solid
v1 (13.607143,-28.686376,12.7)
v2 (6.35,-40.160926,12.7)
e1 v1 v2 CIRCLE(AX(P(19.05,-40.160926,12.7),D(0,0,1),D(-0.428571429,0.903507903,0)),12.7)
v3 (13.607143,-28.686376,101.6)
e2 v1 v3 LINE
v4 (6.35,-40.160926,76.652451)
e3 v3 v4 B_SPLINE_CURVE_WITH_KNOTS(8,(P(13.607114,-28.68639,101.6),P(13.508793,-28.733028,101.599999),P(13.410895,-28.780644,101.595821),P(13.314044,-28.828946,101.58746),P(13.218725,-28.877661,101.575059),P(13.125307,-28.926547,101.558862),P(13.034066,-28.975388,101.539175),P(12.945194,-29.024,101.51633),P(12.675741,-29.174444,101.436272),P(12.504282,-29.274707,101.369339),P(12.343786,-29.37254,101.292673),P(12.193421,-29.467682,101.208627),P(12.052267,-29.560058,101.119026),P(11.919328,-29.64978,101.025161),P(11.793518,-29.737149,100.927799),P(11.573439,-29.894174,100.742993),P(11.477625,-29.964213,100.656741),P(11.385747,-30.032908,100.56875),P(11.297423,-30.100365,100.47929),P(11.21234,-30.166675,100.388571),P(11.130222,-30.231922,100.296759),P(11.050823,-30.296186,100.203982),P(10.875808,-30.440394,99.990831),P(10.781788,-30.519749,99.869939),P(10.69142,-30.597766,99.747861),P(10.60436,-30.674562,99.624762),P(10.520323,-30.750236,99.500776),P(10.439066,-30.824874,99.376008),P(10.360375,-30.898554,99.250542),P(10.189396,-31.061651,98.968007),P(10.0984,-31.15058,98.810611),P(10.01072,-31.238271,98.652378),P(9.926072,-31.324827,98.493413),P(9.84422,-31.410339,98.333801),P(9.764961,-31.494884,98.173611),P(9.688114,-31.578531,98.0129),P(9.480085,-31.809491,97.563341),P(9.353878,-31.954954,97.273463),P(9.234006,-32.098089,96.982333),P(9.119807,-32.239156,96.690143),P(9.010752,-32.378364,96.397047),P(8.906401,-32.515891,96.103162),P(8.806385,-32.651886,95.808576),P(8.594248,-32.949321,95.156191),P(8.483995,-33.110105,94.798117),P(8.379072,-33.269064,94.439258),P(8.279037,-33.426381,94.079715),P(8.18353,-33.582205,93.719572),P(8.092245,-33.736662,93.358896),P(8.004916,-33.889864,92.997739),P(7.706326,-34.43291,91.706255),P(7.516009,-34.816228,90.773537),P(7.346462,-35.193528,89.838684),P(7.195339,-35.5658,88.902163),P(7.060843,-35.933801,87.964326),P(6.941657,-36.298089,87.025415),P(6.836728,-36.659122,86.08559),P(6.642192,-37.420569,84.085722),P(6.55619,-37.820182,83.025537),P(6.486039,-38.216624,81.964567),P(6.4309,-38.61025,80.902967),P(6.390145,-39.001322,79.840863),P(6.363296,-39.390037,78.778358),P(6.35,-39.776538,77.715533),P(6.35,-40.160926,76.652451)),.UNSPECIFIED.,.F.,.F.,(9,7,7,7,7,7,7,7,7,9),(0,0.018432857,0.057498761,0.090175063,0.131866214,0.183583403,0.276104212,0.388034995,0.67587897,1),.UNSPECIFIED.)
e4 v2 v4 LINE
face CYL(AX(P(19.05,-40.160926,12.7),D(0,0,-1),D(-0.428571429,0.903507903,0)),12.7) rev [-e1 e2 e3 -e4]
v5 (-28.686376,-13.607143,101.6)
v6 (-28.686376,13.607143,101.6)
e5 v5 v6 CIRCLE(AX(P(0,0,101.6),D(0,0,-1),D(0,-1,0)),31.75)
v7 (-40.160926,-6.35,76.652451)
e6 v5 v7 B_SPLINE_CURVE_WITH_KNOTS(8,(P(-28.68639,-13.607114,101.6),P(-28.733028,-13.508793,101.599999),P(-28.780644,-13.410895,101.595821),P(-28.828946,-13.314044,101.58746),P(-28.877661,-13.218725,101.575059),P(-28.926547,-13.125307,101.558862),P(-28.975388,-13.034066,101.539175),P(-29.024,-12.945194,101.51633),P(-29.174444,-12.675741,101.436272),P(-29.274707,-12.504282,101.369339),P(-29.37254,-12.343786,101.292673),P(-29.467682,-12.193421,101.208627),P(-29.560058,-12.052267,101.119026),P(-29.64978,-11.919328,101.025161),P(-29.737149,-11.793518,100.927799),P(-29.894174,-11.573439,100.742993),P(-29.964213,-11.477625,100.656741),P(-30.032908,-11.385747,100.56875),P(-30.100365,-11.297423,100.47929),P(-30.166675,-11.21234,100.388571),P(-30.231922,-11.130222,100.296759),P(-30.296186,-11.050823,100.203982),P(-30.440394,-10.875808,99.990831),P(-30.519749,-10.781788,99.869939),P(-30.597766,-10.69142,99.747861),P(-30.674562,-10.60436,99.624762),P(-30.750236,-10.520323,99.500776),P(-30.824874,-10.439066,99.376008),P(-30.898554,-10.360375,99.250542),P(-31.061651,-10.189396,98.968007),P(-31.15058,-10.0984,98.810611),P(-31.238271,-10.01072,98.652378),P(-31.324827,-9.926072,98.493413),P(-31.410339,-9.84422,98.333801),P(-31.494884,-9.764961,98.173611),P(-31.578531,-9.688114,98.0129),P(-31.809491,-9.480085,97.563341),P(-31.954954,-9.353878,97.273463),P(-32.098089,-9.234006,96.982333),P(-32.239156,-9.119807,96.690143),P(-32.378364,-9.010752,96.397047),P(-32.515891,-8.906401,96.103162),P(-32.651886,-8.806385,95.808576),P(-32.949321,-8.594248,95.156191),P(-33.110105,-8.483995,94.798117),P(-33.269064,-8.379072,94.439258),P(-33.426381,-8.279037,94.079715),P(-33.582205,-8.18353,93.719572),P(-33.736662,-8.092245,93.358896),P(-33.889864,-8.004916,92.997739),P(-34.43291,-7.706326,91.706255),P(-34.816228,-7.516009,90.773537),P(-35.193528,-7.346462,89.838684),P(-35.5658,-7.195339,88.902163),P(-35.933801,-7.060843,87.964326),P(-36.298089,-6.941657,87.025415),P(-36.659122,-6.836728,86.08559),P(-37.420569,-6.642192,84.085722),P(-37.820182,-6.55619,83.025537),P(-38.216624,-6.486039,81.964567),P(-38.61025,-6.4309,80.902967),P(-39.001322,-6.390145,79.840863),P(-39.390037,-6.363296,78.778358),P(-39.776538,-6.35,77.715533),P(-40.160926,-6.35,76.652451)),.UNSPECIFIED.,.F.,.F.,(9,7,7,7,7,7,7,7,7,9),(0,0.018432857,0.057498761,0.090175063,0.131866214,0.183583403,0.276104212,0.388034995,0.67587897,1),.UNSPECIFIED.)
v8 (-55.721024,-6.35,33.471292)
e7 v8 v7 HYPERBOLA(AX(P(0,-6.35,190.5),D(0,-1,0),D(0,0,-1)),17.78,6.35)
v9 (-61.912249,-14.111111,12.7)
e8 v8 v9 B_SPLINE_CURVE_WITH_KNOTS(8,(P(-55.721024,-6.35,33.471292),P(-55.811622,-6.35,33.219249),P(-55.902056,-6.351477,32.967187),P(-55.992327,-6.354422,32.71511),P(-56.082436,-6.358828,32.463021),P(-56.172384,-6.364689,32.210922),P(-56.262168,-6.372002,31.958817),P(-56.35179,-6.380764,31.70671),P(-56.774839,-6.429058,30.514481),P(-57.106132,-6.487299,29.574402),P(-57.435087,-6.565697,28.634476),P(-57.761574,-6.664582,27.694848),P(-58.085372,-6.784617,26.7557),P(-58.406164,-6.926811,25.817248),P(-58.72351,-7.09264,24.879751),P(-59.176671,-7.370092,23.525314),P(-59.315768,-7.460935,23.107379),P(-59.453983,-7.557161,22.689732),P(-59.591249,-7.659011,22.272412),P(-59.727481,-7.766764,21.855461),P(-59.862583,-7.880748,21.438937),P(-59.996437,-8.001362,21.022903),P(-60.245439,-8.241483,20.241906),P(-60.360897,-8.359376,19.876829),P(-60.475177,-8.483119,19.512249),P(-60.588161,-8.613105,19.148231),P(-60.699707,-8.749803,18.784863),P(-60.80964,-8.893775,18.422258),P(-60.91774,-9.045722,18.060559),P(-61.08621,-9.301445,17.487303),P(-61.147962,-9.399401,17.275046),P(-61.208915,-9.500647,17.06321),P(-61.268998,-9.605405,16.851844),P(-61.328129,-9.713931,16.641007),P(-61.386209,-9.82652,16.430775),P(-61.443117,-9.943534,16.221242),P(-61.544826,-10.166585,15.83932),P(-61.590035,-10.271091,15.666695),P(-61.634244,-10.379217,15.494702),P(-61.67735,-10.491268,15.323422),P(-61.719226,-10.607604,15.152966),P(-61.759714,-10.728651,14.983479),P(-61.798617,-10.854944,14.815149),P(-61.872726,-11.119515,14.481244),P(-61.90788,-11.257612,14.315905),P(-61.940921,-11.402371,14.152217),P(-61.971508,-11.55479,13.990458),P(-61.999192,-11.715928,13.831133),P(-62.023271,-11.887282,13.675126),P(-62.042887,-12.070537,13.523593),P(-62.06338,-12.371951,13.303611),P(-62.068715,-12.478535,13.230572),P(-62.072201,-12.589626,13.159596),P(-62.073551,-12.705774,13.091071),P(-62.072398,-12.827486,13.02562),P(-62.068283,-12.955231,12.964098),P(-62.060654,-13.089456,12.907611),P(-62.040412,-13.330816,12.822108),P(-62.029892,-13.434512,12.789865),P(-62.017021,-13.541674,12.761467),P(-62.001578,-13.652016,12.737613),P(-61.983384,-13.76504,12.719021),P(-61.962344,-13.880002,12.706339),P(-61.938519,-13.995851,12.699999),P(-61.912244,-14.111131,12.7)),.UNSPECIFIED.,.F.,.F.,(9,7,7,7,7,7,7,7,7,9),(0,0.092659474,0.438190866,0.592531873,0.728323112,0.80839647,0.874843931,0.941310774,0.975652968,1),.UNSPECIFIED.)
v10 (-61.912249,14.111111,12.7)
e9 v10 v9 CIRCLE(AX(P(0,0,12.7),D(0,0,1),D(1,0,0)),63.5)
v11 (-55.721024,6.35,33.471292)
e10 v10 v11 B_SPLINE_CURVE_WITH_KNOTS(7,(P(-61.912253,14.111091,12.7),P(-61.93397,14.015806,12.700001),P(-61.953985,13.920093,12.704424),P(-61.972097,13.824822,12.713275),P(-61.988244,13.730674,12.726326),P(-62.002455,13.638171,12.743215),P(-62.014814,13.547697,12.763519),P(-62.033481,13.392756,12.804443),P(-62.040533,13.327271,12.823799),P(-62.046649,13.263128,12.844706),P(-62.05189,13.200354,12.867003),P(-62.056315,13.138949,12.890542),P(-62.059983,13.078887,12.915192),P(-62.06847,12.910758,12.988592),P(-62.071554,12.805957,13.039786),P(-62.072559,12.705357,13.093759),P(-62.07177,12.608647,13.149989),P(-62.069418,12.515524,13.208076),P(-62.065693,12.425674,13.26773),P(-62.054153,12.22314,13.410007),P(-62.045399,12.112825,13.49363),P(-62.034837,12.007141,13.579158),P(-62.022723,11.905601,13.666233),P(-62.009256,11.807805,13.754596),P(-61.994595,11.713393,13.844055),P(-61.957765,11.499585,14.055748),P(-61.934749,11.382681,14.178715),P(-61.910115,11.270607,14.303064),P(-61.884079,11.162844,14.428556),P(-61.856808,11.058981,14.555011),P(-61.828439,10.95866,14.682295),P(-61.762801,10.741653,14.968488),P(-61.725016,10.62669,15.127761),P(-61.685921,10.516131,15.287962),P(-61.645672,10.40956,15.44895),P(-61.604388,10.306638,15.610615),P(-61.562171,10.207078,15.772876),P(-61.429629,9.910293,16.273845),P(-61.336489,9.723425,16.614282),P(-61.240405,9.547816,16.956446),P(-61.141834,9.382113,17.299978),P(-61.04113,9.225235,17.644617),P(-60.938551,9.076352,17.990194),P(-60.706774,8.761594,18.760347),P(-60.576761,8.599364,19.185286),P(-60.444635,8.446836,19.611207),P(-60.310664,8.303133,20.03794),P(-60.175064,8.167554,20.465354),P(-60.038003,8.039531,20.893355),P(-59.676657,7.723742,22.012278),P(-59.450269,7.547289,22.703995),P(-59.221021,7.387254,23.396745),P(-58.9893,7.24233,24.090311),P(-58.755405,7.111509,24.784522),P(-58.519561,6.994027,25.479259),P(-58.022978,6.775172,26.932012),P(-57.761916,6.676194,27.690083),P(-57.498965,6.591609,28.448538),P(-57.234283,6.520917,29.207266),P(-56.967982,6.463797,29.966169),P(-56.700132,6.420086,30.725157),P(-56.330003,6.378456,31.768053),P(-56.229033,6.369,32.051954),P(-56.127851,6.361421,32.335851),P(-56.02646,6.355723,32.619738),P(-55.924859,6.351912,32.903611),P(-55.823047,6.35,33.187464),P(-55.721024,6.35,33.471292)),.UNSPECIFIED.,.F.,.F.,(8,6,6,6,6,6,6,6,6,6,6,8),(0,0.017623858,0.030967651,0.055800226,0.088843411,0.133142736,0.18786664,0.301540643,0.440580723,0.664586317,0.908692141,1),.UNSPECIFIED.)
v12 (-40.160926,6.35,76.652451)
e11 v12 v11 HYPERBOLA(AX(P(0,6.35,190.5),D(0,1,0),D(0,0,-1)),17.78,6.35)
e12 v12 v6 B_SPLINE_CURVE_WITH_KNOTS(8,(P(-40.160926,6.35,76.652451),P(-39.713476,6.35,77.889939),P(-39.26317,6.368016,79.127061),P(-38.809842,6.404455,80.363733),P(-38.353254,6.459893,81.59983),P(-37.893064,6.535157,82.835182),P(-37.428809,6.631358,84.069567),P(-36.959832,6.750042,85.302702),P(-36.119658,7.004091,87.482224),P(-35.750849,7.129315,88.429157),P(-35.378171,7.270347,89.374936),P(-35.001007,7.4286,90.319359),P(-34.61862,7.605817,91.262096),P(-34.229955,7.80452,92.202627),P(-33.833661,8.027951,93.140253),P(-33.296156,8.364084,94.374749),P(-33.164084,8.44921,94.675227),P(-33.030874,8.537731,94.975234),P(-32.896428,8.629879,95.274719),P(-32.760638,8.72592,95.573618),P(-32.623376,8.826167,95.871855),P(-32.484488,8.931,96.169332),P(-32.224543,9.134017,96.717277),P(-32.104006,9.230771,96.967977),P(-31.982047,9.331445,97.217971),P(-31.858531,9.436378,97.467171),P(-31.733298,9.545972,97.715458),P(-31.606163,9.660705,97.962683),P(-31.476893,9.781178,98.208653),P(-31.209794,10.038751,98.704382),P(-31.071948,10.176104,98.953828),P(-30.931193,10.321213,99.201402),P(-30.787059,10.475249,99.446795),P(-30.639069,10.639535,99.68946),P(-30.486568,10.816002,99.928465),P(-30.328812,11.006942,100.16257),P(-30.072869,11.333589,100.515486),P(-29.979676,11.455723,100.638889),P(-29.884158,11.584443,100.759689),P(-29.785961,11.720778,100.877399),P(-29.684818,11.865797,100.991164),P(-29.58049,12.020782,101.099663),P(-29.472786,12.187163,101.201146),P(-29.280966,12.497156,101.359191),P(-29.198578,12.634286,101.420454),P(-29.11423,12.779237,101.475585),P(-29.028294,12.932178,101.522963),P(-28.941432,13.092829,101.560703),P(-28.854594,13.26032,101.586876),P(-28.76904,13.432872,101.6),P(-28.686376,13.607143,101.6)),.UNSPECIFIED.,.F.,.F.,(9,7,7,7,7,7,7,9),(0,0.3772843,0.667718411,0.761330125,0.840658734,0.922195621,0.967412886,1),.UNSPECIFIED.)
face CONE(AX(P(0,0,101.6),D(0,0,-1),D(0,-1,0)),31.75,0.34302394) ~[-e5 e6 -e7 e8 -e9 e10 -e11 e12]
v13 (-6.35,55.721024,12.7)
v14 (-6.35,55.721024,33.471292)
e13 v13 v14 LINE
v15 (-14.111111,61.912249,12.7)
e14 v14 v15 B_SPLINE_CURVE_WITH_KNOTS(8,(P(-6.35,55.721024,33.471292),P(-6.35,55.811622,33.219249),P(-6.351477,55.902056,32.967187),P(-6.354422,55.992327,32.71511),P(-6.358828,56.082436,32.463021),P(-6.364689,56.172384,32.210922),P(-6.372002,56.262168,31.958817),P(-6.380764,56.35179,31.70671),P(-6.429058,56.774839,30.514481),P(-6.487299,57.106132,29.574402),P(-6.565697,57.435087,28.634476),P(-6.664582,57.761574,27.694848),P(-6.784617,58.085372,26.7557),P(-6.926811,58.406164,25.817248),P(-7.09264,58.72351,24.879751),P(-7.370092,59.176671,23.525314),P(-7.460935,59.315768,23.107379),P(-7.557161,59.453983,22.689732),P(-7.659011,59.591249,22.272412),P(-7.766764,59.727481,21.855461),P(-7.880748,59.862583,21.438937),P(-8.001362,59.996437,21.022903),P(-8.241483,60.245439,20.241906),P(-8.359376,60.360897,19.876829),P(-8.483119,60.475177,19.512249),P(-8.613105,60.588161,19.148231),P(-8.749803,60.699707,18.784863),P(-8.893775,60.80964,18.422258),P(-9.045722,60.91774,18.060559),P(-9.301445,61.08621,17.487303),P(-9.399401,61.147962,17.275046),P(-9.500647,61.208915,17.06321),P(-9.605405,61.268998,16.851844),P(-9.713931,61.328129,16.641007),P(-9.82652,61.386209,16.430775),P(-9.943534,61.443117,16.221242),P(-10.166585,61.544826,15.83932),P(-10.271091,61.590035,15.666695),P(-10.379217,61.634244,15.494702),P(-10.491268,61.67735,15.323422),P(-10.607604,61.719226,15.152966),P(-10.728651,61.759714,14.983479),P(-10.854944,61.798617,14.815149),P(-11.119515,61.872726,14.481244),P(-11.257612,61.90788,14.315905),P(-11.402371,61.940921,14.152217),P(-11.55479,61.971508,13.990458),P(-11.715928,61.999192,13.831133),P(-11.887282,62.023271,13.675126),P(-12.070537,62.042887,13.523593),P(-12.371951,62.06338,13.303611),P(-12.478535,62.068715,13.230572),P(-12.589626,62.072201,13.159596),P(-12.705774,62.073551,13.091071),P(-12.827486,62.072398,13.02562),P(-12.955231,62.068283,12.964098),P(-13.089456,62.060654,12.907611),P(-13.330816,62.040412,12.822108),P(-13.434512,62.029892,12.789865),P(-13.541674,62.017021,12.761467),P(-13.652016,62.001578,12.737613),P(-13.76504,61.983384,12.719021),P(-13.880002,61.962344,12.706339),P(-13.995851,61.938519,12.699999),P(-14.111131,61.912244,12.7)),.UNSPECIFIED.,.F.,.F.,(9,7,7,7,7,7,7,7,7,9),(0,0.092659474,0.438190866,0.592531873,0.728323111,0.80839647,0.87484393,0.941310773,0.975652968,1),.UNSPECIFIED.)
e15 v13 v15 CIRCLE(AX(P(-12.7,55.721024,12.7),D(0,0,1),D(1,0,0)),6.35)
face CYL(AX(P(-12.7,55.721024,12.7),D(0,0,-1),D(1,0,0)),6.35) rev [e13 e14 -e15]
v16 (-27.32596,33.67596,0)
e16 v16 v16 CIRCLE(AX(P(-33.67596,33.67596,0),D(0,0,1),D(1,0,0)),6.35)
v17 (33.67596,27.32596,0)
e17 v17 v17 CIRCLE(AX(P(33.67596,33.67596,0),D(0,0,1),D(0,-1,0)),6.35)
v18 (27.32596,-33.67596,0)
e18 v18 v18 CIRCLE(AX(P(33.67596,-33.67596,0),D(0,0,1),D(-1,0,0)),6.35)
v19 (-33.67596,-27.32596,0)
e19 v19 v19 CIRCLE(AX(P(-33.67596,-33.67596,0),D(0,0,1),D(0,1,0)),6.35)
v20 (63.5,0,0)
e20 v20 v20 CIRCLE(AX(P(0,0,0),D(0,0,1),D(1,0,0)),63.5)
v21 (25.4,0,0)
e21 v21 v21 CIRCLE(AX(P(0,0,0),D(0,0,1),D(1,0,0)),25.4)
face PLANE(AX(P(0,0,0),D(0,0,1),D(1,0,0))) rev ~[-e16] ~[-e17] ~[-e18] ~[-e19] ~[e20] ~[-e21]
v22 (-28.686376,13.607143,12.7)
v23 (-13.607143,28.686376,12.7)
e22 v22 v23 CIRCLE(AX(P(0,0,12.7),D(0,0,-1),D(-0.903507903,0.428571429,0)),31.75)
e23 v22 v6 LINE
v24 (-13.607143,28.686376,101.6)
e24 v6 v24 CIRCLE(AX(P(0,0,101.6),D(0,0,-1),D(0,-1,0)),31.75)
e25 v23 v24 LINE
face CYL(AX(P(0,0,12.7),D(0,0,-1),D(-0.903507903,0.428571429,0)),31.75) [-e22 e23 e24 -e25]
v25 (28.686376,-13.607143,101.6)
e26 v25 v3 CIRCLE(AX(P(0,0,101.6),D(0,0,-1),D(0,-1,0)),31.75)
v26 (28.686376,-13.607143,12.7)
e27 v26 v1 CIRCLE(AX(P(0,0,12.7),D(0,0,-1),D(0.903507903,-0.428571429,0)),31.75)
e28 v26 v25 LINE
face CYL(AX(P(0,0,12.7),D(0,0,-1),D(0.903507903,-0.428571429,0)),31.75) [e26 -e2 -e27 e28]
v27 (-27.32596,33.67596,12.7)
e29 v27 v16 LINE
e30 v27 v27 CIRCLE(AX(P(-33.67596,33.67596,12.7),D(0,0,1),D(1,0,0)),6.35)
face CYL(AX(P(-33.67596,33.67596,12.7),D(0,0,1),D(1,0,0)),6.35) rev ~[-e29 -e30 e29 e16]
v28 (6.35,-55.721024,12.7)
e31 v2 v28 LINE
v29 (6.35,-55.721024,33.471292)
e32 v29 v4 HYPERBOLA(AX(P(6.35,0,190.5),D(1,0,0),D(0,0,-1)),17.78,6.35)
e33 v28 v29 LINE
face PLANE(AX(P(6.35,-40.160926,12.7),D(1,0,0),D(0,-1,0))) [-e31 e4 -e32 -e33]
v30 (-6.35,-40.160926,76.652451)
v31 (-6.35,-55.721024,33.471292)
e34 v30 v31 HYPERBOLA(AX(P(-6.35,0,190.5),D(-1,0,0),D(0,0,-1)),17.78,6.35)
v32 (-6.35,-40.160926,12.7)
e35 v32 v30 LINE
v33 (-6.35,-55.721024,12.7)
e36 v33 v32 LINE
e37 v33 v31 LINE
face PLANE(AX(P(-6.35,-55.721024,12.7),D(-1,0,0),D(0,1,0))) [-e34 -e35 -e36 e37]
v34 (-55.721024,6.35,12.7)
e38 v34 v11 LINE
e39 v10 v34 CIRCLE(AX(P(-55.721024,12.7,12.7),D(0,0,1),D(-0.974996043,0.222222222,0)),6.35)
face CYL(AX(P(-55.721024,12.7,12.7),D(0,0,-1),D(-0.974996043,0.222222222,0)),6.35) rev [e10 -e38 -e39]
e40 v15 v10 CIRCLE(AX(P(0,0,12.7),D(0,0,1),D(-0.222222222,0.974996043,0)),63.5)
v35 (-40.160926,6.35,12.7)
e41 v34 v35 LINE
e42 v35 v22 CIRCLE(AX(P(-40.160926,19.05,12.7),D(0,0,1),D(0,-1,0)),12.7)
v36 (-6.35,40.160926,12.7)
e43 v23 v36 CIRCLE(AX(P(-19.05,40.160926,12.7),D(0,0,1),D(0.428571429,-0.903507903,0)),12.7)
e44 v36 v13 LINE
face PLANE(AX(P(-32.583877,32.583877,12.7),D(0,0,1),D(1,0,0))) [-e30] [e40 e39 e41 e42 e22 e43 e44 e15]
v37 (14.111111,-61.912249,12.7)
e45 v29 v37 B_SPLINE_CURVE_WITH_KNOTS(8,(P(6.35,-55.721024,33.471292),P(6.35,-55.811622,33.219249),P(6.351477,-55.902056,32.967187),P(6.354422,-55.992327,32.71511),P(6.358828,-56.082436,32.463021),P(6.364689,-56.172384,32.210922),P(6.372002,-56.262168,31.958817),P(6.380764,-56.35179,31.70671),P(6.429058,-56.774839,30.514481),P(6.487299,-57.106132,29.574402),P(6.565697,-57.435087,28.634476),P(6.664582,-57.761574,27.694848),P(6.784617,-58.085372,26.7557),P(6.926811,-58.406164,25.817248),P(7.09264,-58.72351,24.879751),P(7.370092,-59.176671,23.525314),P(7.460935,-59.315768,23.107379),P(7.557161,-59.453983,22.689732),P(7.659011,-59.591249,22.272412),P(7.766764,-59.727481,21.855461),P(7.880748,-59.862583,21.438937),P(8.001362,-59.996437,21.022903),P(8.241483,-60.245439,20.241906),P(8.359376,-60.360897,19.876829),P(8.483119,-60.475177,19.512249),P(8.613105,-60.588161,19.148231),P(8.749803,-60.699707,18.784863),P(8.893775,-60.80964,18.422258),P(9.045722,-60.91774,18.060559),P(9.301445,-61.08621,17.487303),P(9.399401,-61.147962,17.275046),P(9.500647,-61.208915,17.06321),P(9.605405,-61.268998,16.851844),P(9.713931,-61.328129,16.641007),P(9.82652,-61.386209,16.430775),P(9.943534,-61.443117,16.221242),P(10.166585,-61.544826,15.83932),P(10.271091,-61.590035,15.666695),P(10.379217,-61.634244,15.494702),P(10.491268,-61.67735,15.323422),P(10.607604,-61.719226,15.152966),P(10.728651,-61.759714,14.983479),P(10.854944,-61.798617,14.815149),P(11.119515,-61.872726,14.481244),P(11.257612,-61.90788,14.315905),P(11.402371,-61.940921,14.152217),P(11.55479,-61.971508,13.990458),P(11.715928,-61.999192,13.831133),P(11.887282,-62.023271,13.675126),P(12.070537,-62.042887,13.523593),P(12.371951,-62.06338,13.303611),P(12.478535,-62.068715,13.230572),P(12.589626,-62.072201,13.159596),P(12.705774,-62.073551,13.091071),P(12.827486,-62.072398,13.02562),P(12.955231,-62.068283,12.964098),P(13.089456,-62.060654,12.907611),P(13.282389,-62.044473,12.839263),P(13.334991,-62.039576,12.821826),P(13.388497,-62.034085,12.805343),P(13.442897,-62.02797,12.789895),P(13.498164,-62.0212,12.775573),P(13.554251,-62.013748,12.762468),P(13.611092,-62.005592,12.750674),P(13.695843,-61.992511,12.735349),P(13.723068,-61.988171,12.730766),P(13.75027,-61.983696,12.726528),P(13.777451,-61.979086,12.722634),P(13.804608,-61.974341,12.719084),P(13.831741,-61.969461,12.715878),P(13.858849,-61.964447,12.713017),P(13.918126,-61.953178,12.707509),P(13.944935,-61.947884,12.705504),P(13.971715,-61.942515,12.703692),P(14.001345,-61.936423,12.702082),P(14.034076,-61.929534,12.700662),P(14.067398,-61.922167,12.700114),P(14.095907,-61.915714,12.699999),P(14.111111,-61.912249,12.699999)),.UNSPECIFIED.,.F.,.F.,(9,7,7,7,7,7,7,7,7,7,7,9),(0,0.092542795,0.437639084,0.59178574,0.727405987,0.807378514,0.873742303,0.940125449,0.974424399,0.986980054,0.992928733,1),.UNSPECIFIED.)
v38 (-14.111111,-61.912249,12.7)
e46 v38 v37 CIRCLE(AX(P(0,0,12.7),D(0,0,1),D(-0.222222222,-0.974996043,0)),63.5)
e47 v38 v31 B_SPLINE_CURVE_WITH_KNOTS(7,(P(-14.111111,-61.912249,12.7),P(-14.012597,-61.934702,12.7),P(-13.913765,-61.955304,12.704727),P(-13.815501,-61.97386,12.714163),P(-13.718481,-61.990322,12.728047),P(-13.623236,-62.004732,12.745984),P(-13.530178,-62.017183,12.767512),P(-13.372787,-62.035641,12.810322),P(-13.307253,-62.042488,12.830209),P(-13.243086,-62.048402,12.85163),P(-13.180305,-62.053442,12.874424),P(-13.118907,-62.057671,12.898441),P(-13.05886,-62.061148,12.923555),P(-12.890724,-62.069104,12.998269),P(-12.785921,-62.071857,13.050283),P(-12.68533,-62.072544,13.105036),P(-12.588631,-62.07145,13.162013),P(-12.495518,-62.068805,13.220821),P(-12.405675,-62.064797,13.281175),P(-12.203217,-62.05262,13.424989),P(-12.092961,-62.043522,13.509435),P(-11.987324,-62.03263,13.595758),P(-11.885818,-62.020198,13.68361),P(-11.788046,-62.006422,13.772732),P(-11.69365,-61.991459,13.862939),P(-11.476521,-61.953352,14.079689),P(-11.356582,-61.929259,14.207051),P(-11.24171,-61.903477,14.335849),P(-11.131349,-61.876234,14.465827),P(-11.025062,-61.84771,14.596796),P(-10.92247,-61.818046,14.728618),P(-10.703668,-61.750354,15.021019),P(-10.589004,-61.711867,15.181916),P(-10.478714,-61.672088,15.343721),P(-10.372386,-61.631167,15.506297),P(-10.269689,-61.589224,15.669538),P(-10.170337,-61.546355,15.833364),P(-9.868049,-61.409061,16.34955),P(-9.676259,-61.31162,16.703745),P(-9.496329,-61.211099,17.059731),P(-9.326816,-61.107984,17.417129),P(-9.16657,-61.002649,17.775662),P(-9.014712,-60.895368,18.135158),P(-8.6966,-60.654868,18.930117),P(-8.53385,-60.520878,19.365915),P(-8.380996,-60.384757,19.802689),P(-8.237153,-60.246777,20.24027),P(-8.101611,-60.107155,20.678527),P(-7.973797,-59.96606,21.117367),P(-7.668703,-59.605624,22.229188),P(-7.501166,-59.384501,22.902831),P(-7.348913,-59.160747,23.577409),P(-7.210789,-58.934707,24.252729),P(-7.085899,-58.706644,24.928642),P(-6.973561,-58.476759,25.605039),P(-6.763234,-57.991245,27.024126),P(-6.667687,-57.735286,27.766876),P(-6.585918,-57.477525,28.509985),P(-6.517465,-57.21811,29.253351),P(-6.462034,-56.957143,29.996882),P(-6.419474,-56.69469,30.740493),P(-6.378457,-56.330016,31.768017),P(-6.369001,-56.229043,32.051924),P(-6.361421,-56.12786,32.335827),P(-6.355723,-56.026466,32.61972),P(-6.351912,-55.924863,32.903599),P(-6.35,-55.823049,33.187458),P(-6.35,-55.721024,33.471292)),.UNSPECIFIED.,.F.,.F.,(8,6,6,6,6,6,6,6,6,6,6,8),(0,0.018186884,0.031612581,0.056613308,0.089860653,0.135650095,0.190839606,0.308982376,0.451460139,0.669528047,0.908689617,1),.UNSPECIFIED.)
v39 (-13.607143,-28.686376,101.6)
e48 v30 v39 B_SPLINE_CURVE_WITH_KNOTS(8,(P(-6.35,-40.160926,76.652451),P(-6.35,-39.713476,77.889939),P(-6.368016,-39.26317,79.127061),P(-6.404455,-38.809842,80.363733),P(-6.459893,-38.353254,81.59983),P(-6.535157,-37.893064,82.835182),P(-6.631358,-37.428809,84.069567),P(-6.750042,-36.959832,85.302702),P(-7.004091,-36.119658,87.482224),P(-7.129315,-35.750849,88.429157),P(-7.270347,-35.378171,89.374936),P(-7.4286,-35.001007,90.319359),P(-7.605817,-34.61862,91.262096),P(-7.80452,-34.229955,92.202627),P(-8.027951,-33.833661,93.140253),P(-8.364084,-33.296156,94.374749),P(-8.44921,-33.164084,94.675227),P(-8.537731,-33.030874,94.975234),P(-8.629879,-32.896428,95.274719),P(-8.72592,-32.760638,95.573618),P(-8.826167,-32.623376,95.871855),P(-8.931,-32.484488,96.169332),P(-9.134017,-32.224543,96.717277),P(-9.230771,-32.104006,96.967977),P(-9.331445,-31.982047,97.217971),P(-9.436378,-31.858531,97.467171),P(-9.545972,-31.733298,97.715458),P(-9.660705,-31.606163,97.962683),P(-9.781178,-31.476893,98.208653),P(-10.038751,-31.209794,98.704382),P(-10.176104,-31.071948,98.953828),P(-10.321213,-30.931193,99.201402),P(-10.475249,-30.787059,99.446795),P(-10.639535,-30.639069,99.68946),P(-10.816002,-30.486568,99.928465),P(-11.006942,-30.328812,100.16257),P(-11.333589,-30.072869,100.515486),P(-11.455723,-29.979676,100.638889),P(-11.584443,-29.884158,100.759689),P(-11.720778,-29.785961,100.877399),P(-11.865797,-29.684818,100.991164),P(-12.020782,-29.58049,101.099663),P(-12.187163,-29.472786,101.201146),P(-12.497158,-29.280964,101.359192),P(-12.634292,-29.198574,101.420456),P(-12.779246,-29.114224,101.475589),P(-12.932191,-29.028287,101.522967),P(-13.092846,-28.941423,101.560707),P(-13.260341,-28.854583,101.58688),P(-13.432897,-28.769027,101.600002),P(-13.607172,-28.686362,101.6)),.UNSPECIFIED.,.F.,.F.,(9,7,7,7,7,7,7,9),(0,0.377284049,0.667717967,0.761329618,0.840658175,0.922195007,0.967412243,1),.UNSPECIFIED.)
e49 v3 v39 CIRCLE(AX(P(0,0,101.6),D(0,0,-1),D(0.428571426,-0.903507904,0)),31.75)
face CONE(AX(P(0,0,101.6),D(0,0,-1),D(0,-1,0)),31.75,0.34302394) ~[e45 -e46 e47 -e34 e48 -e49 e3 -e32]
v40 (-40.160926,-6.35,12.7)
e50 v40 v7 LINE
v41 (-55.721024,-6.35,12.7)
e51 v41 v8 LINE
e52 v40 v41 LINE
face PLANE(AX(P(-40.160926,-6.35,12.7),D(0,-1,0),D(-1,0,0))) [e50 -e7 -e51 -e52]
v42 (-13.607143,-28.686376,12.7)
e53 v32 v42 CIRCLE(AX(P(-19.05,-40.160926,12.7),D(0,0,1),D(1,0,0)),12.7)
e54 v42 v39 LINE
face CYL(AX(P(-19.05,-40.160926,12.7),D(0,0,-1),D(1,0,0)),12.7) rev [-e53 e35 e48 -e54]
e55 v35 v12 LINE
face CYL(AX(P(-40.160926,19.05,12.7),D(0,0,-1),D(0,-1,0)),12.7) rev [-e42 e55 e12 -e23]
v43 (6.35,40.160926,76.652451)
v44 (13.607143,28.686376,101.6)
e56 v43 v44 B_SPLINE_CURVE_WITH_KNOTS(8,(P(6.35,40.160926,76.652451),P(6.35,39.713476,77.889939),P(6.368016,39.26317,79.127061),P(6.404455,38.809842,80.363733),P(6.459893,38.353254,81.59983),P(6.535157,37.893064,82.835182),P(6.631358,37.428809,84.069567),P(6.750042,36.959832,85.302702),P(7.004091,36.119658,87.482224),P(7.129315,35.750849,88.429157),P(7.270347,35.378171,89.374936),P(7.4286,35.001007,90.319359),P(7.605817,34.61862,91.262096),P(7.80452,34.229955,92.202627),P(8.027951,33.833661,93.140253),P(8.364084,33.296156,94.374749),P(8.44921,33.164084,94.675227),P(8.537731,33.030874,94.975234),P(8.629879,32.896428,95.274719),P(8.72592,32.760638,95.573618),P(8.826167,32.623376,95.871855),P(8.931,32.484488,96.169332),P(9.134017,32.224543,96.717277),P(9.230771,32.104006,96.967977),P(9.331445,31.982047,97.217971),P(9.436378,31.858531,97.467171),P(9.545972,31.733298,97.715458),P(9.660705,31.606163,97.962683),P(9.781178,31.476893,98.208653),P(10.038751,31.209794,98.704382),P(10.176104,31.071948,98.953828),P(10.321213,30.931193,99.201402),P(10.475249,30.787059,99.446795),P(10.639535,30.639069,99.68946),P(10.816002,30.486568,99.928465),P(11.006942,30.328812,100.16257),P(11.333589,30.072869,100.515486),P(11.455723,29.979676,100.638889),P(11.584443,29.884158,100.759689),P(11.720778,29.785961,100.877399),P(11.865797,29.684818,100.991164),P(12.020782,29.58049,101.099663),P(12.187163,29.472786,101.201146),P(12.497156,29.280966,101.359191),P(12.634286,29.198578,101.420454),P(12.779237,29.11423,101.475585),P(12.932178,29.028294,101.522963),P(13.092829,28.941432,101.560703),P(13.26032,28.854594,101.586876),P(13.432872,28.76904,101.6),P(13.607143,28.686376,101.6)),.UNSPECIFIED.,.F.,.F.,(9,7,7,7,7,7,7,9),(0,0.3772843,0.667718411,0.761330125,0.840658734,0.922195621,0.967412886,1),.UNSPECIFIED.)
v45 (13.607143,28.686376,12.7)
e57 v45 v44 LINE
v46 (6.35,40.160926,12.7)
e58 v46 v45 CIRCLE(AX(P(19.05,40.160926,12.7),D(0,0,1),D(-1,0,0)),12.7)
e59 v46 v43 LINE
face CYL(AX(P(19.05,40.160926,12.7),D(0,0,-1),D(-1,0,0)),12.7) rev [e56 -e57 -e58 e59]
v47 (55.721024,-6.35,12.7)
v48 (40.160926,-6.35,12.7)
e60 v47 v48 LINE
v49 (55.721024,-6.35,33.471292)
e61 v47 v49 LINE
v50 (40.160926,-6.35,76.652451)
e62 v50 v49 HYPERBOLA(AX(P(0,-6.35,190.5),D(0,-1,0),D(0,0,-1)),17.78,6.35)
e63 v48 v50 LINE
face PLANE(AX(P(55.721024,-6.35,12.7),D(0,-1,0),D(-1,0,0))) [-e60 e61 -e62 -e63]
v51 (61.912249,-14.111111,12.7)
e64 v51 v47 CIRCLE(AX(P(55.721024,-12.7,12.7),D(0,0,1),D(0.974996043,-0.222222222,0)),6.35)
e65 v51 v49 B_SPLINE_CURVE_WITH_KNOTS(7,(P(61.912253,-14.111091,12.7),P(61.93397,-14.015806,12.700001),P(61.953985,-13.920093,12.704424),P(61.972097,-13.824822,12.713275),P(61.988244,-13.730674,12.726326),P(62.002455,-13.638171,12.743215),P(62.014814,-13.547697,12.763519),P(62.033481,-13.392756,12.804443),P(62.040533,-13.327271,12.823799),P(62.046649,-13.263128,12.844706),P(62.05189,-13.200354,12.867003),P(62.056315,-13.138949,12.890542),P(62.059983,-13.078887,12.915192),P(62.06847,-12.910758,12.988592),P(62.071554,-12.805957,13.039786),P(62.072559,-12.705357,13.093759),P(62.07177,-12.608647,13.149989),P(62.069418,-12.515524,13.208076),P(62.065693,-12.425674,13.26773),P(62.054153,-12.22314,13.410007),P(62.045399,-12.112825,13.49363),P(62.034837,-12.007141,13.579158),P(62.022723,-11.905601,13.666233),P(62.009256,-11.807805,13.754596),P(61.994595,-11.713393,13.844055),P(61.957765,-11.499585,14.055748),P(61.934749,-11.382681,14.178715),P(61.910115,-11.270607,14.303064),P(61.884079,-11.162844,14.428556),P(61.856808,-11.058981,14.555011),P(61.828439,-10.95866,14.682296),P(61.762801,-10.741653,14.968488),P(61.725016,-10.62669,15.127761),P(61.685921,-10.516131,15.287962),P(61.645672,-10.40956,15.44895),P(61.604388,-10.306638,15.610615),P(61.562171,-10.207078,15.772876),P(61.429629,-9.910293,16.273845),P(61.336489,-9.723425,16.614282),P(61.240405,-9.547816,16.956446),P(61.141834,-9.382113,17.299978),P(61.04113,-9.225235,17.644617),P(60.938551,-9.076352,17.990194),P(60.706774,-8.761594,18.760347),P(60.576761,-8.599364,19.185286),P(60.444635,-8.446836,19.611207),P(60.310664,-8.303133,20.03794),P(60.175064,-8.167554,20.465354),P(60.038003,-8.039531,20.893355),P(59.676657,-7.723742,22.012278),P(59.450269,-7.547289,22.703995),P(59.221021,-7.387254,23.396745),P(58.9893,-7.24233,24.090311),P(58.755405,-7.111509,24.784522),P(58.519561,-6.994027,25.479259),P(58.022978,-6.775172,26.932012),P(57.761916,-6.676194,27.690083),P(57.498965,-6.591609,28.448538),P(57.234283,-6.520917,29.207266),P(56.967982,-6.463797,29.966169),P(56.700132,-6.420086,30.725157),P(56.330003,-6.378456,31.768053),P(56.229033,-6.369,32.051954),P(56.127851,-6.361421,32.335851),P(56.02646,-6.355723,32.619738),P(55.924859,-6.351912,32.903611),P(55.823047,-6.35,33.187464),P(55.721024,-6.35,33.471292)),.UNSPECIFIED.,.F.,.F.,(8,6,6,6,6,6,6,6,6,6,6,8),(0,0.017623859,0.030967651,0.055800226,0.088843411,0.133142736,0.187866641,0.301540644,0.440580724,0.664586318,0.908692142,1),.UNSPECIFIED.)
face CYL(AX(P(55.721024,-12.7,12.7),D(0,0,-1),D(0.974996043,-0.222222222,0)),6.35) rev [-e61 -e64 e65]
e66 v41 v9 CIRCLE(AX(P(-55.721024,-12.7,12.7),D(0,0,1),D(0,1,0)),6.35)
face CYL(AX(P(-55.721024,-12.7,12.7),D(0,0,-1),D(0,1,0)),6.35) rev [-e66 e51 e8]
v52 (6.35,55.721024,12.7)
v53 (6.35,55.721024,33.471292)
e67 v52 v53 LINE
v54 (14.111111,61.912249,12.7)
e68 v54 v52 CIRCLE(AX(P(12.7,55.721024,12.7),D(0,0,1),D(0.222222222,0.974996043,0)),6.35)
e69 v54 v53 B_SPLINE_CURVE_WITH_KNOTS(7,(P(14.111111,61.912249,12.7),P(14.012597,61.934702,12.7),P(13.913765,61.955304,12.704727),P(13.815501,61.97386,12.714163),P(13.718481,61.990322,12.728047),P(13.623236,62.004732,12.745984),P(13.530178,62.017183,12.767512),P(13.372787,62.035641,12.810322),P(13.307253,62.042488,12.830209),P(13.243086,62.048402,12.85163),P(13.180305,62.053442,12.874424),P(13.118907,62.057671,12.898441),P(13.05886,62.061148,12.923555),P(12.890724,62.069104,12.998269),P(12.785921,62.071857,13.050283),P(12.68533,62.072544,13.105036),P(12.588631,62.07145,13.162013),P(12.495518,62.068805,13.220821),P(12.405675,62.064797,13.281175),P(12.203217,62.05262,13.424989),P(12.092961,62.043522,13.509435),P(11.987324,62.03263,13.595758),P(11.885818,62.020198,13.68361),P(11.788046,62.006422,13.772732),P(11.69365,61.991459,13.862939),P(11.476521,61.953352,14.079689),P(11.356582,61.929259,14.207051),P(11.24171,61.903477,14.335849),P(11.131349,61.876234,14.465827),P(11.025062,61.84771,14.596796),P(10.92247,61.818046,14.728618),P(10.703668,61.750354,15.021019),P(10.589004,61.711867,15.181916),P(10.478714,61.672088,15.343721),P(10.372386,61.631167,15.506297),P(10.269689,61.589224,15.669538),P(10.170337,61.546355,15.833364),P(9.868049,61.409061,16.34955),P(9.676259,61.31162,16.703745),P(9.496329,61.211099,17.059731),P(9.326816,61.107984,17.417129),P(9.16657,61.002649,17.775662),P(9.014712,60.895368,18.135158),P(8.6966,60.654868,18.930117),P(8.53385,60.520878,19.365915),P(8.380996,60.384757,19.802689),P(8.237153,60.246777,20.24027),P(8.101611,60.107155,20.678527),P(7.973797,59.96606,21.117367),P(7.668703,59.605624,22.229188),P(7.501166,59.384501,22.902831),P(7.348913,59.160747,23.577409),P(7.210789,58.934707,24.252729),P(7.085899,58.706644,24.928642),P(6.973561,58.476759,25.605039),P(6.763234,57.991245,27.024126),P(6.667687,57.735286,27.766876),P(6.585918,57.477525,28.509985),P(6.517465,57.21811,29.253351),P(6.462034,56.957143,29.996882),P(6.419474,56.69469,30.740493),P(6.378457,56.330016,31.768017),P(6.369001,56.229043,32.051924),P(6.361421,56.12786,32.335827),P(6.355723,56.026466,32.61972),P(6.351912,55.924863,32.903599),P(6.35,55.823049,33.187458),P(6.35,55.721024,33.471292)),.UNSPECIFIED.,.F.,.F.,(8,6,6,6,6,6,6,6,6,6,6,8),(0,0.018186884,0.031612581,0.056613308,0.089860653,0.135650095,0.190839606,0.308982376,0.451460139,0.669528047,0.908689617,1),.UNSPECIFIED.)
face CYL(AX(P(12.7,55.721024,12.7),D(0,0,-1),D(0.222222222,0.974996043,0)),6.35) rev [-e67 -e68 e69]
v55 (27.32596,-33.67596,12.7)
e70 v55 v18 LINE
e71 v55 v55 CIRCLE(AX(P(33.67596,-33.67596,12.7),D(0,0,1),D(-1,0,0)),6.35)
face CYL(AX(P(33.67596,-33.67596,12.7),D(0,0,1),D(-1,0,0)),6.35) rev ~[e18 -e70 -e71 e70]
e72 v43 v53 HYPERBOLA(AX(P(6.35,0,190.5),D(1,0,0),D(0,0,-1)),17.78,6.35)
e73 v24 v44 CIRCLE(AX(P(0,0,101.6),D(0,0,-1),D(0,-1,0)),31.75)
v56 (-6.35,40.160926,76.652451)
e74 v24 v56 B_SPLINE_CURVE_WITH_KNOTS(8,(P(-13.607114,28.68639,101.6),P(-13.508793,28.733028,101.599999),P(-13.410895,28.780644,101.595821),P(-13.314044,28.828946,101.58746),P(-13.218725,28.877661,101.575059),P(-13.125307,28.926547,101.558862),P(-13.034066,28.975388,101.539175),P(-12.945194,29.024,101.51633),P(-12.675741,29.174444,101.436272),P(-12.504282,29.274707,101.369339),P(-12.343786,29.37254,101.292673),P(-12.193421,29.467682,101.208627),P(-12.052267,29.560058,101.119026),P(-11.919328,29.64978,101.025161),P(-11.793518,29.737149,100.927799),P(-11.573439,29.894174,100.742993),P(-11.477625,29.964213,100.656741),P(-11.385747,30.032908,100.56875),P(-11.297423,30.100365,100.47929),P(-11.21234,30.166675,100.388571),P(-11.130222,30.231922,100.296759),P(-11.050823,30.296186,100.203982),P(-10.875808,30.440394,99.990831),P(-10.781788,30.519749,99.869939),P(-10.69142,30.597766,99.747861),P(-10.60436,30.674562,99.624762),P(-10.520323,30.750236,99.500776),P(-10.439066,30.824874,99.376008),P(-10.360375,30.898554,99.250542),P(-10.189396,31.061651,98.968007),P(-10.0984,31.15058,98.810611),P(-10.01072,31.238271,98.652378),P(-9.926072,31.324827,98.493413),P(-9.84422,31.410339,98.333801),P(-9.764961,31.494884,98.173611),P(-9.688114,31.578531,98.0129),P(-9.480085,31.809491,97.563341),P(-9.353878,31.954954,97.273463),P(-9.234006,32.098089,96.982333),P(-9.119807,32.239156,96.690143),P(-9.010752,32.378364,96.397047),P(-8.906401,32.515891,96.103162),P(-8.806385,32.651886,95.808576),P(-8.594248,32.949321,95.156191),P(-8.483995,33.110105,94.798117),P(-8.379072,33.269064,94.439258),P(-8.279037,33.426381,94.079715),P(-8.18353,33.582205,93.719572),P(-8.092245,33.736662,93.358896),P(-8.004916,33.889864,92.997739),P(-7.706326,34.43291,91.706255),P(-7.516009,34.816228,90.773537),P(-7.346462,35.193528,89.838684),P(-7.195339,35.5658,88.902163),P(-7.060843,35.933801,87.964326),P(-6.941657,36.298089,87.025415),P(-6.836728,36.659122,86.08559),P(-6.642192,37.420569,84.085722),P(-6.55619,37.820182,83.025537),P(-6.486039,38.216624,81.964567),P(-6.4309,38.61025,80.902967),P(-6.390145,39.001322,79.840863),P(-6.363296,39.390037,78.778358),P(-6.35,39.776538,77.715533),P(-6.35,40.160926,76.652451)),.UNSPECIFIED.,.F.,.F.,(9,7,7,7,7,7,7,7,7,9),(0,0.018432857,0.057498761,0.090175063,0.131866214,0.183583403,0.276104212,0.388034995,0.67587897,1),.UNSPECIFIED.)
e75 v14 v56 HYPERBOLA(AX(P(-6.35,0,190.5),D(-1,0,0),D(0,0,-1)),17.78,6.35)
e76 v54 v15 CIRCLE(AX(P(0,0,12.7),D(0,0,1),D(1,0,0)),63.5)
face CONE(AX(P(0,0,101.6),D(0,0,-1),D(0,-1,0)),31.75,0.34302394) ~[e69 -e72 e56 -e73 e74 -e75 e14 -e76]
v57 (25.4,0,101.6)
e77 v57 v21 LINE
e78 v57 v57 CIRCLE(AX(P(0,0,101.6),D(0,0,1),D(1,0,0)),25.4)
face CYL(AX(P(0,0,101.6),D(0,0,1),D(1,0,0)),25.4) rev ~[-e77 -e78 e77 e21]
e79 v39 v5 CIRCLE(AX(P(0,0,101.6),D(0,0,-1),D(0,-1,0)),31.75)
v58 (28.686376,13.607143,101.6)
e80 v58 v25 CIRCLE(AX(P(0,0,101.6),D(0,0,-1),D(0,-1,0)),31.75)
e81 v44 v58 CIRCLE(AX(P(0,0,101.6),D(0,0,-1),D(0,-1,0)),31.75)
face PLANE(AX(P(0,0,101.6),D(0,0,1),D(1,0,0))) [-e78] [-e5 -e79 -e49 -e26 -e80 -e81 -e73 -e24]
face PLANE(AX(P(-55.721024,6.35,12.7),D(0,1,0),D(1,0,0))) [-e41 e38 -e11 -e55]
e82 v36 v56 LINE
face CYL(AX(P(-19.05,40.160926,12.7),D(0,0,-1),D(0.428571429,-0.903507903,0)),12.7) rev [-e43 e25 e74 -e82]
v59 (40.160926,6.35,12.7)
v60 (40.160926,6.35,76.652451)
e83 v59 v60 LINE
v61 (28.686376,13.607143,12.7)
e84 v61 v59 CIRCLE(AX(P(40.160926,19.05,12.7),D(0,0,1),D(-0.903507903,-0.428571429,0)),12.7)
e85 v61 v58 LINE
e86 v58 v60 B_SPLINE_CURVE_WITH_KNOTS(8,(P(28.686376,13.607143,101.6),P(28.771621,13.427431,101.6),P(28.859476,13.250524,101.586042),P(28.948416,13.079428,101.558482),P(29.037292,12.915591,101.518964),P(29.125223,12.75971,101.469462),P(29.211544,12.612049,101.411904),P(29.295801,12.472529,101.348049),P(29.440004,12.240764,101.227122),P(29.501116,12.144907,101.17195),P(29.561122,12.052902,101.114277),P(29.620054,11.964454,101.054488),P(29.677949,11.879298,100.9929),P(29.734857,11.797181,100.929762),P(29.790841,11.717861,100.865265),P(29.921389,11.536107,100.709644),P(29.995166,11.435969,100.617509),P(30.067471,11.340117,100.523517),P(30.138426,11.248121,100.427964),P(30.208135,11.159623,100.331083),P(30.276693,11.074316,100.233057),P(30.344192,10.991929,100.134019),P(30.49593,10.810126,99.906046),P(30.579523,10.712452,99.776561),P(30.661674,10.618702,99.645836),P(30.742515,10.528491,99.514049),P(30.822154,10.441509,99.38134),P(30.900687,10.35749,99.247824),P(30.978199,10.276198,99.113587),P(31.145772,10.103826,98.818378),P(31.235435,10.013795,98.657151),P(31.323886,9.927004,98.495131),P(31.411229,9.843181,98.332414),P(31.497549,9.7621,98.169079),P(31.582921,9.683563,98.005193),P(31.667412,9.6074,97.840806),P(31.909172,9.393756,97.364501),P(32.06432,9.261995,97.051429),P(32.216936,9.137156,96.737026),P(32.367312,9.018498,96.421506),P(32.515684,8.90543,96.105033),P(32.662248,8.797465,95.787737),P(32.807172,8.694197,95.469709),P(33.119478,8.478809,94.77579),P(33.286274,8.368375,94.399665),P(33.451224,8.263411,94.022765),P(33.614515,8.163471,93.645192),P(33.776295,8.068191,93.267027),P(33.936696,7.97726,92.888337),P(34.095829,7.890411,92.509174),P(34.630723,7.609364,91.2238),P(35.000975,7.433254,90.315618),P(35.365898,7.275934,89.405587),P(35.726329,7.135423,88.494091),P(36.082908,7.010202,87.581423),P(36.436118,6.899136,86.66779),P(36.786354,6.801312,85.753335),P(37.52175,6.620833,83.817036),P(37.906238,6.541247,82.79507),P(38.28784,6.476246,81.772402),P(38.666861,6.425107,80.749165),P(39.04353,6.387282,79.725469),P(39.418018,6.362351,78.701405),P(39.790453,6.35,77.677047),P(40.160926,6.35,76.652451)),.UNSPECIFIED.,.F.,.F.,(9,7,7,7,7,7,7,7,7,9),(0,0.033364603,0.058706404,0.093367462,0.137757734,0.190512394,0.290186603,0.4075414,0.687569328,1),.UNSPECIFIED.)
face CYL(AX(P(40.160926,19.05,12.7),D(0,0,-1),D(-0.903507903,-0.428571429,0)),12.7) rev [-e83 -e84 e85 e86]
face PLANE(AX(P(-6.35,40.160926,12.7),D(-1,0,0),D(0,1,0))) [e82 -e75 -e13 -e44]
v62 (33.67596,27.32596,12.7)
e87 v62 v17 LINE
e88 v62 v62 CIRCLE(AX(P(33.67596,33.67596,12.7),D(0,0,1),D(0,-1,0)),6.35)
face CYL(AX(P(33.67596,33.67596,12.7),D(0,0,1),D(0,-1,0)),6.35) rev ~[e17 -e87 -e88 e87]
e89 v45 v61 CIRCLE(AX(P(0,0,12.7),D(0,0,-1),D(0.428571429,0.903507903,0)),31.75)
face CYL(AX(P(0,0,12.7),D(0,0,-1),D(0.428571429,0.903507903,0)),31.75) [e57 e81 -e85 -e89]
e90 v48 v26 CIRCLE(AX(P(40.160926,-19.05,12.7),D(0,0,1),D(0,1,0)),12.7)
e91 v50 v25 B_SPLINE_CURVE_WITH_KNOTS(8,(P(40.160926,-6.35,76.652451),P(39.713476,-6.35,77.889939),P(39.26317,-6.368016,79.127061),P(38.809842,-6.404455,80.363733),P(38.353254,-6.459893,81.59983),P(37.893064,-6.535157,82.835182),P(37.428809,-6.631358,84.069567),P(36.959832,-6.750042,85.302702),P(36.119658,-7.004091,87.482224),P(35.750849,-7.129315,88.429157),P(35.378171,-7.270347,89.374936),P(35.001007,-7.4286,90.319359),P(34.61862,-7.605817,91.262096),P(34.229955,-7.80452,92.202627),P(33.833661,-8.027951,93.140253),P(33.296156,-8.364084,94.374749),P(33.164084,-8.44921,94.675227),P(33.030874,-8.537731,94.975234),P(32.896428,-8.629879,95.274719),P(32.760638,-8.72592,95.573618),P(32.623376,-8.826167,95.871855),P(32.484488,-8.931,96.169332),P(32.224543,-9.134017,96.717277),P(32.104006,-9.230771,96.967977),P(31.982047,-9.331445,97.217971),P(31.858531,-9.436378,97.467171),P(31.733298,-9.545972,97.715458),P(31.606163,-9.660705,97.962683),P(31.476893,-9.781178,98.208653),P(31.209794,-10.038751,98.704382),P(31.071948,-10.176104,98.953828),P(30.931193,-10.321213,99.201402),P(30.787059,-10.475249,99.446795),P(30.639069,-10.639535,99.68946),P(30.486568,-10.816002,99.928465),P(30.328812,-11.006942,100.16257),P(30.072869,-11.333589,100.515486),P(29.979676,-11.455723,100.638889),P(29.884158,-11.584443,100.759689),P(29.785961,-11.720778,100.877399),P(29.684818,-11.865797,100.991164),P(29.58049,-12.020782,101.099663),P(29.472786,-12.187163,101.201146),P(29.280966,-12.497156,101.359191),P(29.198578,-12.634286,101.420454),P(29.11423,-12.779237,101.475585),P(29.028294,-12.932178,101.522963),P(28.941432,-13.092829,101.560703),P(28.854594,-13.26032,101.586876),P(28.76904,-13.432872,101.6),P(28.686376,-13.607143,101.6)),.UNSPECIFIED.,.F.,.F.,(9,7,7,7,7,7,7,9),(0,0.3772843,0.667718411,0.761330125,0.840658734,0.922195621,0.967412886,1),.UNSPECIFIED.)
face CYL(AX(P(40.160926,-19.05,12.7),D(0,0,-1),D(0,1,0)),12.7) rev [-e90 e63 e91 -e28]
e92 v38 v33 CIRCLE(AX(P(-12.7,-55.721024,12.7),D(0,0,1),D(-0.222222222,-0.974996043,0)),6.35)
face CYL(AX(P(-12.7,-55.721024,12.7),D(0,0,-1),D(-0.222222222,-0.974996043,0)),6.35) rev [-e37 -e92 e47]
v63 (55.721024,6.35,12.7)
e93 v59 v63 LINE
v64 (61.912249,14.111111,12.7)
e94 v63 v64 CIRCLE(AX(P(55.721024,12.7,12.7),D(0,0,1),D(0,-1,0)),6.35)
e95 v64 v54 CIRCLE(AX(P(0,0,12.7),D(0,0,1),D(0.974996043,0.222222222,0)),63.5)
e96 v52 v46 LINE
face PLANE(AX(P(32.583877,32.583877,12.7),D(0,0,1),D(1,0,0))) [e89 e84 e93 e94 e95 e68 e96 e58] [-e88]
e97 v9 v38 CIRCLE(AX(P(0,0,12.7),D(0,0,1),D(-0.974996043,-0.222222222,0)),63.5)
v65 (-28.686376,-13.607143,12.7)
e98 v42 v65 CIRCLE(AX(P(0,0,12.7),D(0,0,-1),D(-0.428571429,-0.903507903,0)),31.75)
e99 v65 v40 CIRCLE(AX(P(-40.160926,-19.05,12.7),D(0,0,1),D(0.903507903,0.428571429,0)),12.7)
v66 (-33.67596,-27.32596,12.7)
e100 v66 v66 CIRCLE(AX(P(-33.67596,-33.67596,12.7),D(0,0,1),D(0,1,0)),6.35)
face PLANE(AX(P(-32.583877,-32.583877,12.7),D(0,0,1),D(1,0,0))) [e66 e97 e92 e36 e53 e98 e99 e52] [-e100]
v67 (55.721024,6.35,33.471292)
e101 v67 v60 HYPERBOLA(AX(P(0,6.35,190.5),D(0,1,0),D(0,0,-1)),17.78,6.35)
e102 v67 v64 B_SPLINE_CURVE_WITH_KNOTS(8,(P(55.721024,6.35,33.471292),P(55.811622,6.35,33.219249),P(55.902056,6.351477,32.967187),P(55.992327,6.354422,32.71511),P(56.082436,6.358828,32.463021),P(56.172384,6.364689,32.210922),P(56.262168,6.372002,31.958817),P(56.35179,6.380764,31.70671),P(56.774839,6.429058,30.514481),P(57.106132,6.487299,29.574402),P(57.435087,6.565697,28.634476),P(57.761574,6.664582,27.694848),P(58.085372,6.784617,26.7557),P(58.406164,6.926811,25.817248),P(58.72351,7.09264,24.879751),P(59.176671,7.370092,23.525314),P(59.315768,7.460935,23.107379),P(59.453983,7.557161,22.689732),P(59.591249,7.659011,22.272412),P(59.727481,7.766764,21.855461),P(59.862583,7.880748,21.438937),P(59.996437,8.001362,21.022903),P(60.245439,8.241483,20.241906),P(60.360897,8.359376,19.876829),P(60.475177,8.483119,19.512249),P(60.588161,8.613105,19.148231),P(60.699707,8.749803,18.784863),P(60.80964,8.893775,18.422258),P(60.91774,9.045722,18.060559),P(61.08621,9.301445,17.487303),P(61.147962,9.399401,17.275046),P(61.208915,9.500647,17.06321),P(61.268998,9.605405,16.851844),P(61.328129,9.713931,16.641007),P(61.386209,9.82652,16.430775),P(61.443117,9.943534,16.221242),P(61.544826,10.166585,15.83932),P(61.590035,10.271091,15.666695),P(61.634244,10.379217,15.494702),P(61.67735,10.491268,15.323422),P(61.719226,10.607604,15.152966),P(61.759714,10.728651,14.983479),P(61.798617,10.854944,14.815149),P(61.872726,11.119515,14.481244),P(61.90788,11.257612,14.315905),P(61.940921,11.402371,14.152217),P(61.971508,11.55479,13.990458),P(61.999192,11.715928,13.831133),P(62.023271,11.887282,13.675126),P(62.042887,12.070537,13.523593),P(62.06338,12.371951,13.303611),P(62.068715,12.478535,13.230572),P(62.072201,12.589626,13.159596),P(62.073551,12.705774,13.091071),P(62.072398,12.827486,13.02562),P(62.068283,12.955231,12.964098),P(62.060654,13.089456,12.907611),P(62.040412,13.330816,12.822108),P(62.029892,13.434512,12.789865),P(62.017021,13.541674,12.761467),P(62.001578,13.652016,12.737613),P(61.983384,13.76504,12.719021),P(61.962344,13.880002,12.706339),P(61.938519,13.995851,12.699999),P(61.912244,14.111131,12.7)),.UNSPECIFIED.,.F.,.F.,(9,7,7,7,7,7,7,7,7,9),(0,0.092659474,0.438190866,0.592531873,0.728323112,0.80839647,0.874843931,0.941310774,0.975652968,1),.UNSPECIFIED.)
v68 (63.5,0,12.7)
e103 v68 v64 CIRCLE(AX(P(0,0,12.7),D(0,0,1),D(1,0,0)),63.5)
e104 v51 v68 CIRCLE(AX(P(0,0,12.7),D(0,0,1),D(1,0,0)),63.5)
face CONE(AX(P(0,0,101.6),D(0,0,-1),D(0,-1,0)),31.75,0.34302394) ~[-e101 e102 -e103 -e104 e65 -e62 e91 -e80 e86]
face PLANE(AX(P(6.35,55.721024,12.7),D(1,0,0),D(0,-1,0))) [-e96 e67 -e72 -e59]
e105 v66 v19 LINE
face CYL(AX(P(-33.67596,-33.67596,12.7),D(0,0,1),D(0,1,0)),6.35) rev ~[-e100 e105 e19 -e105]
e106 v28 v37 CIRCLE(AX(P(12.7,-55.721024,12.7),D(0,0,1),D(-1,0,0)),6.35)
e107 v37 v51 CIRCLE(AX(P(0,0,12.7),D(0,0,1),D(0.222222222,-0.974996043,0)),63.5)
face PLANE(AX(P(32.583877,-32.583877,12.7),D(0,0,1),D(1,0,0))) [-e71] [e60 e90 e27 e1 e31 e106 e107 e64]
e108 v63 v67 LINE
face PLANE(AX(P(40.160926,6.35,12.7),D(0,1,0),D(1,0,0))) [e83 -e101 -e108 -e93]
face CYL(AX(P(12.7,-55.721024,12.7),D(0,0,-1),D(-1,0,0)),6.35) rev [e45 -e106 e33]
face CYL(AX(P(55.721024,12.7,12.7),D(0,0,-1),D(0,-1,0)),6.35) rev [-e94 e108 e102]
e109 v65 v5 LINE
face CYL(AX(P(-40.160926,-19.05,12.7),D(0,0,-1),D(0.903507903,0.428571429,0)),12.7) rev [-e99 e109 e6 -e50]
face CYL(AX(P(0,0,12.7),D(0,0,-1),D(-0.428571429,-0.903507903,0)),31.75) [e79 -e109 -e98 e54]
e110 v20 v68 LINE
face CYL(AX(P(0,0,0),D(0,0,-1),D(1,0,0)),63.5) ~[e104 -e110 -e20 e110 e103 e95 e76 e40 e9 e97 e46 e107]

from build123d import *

# Parameters (mm, degrees)
F0_R            = 63.5
F1_DEPTH        = 12.7
F2_R            = 31.75
F3_DEPTH        = 88.9
F7_DEPTH        = 88.9010001
F8_R            = 6.35
F9_DEPTH        = 12.701
F9_COPIES_COUNT = 4
F10_R           = 25.4
F11_DEPTH       = 101.601


# Not quite as in the source:
# - a pattern or mirror of a feature is missing from the dataset's text; its kind, count and spacing are read off the source's solid


with BuildPart() as f1:
    # F0 (on Top) → F1 (new body)
    with BuildSketch(Plane.XY):
        Circle(F0_R)
    extrude(amount=F1_DEPTH)

    # F2 (on face) → F3 (join)
    with BuildSketch(Plane.XY.offset(12.7)):
        Circle(F2_R)
    extrude(amount=F3_DEPTH)

    # F4 (on Right) → F5 (revolve)
    with BuildSketch(Plane.YZ):
        Polygon((-31.75, 12.7), (-31.75, 101.6), (-63.5, 12.7), align=None)
    revolve(axis=Axis((0, 0, 73.5445022583), (0, 0, 1)))

    # F6 (on face) → F7 (cut, through all)
    with BuildSketch(Plane.XY.offset(12.7)):
        with BuildLine():
            ThreePointArc((-14.1111111111, 61.9122487333), (-44.9012806053, 44.9012806053), (-61.9122487333, 14.1111111111))
            ThreePointArc((-61.9122487333, 14.1111111111), (-60.6850472058, 8.7400792657), (-55.7210238599, 6.35))
            Line((-55.7210238599, 6.35), (-40.1609262841, 6.35))
            ThreePointArc((-40.1609262841, 6.35), (-33.3724907396, 8.3165409649), (-28.6863759172, 13.6071428571))
            ThreePointArc((-28.6863759172, 13.6071428571), (-22.4506403027, 22.4506403027), (-13.6071428571, 28.6863759172))
            ThreePointArc((-13.6071428571, 28.6863759172), (-8.3165409649, 33.3724907396), (-6.35, 40.1609262841))
            Line((-6.35, 40.1609262841), (-6.35, 55.7210238599))
            ThreePointArc((-6.35, 55.7210238599), (-8.7400792657, 60.6850472058), (-14.1111111111, 61.9122487333))
        make_face()
        with BuildLine():
            Line((-40.1609262841, -6.35), (-55.7210238599, -6.35))
            ThreePointArc((-55.7210238599, -6.35), (-60.6850472058, -8.7400792657), (-61.9122487333, -14.1111111111))
            ThreePointArc((-61.9122487333, -14.1111111111), (-44.9012806053, -44.9012806053), (-14.1111111111, -61.9122487333))
            ThreePointArc((-14.1111111111, -61.9122487333), (-8.7400792657, -60.6850472058), (-6.35, -55.7210238599))
            Line((-6.35, -55.7210238599), (-6.35, -40.1609262841))
            ThreePointArc((-6.35, -40.1609262841), (-8.3165409649, -33.3724907396), (-13.6071428571, -28.6863759172))
            ThreePointArc((-13.6071428571, -28.6863759172), (-22.4506403027, -22.4506403027), (-28.6863759172, -13.6071428571))
            ThreePointArc((-28.6863759172, -13.6071428571), (-33.3724907396, -8.3165409649), (-40.1609262841, -6.35))
        make_face()
        with BuildLine():
            Line((6.35, -40.1609262841), (6.35, -55.7210238599))
            ThreePointArc((6.35, -55.7210238599), (8.7400792657, -60.6850472058), (14.1111111111, -61.9122487333))
            ThreePointArc((14.1111111111, -61.9122487333), (44.9012806053, -44.9012806053), (61.9122487333, -14.1111111111))
            ThreePointArc((61.9122487333, -14.1111111111), (60.6850472058, -8.7400792657), (55.7210238599, -6.35))
            Line((55.7210238599, -6.35), (40.1609262841, -6.35))
            ThreePointArc((40.1609262841, -6.35), (33.3724907396, -8.3165409649), (28.6863759172, -13.6071428571))
            ThreePointArc((28.6863759172, -13.6071428571), (22.4506403027, -22.4506403027), (13.6071428571, -28.6863759172))
            ThreePointArc((13.6071428571, -28.6863759172), (8.3165409649, -33.3724907396), (6.35, -40.1609262841))
        make_face()
        with BuildLine():
            Line((40.1609262841, 6.35), (55.7210238599, 6.35))
            ThreePointArc((55.7210238599, 6.35), (60.6850472058, 8.7400792657), (61.9122487333, 14.1111111111))
            ThreePointArc((61.9122487333, 14.1111111111), (44.9012806053, 44.9012806053), (14.1111111111, 61.9122487333))
            ThreePointArc((14.1111111111, 61.9122487333), (8.7400792657, 60.6850472058), (6.35, 55.7210238599))
            Line((6.35, 55.7210238599), (6.35, 40.1609262841))
            ThreePointArc((6.35, 40.1609262841), (8.3165409649, 33.3724907396), (13.6071428571, 28.6863759172))
            ThreePointArc((13.6071428571, 28.6863759172), (22.4506403027, 22.4506403027), (28.6863759172, 13.6071428571))
            ThreePointArc((28.6863759172, 13.6071428571), (33.3724907396, 8.3165409649), (40.1609262841, 6.35))
        make_face()
    extrude(amount=F7_DEPTH, mode=Mode.SUBTRACT)

    # F8 (on face) → F9 (cut, through all)
    with BuildSketch(Plane.XY.offset(12.7)):
        with Locations((-33.675960454, 33.675960454)):
            Circle(F8_R)
    f9 = extrude(amount=-F9_DEPTH, mode=Mode.SUBTRACT)

    # F9_copies: F9 ×4 about axis
    f9_copies_axis = Axis((0, 0, 0), (0, 0, 1))
    for i in range(1, F9_COPIES_COUNT):
        add(f9.rotate(f9_copies_axis, i * 360 / F9_COPIES_COUNT), mode=Mode.SUBTRACT)

    # F10 (on face) → F11 (cut, through all)
    with BuildSketch(Plane.XY.offset(101.6)):
        Circle(F10_R)
    extrude(amount=-F11_DEPTH, mode=Mode.SUBTRACT)


solid = f1.part
